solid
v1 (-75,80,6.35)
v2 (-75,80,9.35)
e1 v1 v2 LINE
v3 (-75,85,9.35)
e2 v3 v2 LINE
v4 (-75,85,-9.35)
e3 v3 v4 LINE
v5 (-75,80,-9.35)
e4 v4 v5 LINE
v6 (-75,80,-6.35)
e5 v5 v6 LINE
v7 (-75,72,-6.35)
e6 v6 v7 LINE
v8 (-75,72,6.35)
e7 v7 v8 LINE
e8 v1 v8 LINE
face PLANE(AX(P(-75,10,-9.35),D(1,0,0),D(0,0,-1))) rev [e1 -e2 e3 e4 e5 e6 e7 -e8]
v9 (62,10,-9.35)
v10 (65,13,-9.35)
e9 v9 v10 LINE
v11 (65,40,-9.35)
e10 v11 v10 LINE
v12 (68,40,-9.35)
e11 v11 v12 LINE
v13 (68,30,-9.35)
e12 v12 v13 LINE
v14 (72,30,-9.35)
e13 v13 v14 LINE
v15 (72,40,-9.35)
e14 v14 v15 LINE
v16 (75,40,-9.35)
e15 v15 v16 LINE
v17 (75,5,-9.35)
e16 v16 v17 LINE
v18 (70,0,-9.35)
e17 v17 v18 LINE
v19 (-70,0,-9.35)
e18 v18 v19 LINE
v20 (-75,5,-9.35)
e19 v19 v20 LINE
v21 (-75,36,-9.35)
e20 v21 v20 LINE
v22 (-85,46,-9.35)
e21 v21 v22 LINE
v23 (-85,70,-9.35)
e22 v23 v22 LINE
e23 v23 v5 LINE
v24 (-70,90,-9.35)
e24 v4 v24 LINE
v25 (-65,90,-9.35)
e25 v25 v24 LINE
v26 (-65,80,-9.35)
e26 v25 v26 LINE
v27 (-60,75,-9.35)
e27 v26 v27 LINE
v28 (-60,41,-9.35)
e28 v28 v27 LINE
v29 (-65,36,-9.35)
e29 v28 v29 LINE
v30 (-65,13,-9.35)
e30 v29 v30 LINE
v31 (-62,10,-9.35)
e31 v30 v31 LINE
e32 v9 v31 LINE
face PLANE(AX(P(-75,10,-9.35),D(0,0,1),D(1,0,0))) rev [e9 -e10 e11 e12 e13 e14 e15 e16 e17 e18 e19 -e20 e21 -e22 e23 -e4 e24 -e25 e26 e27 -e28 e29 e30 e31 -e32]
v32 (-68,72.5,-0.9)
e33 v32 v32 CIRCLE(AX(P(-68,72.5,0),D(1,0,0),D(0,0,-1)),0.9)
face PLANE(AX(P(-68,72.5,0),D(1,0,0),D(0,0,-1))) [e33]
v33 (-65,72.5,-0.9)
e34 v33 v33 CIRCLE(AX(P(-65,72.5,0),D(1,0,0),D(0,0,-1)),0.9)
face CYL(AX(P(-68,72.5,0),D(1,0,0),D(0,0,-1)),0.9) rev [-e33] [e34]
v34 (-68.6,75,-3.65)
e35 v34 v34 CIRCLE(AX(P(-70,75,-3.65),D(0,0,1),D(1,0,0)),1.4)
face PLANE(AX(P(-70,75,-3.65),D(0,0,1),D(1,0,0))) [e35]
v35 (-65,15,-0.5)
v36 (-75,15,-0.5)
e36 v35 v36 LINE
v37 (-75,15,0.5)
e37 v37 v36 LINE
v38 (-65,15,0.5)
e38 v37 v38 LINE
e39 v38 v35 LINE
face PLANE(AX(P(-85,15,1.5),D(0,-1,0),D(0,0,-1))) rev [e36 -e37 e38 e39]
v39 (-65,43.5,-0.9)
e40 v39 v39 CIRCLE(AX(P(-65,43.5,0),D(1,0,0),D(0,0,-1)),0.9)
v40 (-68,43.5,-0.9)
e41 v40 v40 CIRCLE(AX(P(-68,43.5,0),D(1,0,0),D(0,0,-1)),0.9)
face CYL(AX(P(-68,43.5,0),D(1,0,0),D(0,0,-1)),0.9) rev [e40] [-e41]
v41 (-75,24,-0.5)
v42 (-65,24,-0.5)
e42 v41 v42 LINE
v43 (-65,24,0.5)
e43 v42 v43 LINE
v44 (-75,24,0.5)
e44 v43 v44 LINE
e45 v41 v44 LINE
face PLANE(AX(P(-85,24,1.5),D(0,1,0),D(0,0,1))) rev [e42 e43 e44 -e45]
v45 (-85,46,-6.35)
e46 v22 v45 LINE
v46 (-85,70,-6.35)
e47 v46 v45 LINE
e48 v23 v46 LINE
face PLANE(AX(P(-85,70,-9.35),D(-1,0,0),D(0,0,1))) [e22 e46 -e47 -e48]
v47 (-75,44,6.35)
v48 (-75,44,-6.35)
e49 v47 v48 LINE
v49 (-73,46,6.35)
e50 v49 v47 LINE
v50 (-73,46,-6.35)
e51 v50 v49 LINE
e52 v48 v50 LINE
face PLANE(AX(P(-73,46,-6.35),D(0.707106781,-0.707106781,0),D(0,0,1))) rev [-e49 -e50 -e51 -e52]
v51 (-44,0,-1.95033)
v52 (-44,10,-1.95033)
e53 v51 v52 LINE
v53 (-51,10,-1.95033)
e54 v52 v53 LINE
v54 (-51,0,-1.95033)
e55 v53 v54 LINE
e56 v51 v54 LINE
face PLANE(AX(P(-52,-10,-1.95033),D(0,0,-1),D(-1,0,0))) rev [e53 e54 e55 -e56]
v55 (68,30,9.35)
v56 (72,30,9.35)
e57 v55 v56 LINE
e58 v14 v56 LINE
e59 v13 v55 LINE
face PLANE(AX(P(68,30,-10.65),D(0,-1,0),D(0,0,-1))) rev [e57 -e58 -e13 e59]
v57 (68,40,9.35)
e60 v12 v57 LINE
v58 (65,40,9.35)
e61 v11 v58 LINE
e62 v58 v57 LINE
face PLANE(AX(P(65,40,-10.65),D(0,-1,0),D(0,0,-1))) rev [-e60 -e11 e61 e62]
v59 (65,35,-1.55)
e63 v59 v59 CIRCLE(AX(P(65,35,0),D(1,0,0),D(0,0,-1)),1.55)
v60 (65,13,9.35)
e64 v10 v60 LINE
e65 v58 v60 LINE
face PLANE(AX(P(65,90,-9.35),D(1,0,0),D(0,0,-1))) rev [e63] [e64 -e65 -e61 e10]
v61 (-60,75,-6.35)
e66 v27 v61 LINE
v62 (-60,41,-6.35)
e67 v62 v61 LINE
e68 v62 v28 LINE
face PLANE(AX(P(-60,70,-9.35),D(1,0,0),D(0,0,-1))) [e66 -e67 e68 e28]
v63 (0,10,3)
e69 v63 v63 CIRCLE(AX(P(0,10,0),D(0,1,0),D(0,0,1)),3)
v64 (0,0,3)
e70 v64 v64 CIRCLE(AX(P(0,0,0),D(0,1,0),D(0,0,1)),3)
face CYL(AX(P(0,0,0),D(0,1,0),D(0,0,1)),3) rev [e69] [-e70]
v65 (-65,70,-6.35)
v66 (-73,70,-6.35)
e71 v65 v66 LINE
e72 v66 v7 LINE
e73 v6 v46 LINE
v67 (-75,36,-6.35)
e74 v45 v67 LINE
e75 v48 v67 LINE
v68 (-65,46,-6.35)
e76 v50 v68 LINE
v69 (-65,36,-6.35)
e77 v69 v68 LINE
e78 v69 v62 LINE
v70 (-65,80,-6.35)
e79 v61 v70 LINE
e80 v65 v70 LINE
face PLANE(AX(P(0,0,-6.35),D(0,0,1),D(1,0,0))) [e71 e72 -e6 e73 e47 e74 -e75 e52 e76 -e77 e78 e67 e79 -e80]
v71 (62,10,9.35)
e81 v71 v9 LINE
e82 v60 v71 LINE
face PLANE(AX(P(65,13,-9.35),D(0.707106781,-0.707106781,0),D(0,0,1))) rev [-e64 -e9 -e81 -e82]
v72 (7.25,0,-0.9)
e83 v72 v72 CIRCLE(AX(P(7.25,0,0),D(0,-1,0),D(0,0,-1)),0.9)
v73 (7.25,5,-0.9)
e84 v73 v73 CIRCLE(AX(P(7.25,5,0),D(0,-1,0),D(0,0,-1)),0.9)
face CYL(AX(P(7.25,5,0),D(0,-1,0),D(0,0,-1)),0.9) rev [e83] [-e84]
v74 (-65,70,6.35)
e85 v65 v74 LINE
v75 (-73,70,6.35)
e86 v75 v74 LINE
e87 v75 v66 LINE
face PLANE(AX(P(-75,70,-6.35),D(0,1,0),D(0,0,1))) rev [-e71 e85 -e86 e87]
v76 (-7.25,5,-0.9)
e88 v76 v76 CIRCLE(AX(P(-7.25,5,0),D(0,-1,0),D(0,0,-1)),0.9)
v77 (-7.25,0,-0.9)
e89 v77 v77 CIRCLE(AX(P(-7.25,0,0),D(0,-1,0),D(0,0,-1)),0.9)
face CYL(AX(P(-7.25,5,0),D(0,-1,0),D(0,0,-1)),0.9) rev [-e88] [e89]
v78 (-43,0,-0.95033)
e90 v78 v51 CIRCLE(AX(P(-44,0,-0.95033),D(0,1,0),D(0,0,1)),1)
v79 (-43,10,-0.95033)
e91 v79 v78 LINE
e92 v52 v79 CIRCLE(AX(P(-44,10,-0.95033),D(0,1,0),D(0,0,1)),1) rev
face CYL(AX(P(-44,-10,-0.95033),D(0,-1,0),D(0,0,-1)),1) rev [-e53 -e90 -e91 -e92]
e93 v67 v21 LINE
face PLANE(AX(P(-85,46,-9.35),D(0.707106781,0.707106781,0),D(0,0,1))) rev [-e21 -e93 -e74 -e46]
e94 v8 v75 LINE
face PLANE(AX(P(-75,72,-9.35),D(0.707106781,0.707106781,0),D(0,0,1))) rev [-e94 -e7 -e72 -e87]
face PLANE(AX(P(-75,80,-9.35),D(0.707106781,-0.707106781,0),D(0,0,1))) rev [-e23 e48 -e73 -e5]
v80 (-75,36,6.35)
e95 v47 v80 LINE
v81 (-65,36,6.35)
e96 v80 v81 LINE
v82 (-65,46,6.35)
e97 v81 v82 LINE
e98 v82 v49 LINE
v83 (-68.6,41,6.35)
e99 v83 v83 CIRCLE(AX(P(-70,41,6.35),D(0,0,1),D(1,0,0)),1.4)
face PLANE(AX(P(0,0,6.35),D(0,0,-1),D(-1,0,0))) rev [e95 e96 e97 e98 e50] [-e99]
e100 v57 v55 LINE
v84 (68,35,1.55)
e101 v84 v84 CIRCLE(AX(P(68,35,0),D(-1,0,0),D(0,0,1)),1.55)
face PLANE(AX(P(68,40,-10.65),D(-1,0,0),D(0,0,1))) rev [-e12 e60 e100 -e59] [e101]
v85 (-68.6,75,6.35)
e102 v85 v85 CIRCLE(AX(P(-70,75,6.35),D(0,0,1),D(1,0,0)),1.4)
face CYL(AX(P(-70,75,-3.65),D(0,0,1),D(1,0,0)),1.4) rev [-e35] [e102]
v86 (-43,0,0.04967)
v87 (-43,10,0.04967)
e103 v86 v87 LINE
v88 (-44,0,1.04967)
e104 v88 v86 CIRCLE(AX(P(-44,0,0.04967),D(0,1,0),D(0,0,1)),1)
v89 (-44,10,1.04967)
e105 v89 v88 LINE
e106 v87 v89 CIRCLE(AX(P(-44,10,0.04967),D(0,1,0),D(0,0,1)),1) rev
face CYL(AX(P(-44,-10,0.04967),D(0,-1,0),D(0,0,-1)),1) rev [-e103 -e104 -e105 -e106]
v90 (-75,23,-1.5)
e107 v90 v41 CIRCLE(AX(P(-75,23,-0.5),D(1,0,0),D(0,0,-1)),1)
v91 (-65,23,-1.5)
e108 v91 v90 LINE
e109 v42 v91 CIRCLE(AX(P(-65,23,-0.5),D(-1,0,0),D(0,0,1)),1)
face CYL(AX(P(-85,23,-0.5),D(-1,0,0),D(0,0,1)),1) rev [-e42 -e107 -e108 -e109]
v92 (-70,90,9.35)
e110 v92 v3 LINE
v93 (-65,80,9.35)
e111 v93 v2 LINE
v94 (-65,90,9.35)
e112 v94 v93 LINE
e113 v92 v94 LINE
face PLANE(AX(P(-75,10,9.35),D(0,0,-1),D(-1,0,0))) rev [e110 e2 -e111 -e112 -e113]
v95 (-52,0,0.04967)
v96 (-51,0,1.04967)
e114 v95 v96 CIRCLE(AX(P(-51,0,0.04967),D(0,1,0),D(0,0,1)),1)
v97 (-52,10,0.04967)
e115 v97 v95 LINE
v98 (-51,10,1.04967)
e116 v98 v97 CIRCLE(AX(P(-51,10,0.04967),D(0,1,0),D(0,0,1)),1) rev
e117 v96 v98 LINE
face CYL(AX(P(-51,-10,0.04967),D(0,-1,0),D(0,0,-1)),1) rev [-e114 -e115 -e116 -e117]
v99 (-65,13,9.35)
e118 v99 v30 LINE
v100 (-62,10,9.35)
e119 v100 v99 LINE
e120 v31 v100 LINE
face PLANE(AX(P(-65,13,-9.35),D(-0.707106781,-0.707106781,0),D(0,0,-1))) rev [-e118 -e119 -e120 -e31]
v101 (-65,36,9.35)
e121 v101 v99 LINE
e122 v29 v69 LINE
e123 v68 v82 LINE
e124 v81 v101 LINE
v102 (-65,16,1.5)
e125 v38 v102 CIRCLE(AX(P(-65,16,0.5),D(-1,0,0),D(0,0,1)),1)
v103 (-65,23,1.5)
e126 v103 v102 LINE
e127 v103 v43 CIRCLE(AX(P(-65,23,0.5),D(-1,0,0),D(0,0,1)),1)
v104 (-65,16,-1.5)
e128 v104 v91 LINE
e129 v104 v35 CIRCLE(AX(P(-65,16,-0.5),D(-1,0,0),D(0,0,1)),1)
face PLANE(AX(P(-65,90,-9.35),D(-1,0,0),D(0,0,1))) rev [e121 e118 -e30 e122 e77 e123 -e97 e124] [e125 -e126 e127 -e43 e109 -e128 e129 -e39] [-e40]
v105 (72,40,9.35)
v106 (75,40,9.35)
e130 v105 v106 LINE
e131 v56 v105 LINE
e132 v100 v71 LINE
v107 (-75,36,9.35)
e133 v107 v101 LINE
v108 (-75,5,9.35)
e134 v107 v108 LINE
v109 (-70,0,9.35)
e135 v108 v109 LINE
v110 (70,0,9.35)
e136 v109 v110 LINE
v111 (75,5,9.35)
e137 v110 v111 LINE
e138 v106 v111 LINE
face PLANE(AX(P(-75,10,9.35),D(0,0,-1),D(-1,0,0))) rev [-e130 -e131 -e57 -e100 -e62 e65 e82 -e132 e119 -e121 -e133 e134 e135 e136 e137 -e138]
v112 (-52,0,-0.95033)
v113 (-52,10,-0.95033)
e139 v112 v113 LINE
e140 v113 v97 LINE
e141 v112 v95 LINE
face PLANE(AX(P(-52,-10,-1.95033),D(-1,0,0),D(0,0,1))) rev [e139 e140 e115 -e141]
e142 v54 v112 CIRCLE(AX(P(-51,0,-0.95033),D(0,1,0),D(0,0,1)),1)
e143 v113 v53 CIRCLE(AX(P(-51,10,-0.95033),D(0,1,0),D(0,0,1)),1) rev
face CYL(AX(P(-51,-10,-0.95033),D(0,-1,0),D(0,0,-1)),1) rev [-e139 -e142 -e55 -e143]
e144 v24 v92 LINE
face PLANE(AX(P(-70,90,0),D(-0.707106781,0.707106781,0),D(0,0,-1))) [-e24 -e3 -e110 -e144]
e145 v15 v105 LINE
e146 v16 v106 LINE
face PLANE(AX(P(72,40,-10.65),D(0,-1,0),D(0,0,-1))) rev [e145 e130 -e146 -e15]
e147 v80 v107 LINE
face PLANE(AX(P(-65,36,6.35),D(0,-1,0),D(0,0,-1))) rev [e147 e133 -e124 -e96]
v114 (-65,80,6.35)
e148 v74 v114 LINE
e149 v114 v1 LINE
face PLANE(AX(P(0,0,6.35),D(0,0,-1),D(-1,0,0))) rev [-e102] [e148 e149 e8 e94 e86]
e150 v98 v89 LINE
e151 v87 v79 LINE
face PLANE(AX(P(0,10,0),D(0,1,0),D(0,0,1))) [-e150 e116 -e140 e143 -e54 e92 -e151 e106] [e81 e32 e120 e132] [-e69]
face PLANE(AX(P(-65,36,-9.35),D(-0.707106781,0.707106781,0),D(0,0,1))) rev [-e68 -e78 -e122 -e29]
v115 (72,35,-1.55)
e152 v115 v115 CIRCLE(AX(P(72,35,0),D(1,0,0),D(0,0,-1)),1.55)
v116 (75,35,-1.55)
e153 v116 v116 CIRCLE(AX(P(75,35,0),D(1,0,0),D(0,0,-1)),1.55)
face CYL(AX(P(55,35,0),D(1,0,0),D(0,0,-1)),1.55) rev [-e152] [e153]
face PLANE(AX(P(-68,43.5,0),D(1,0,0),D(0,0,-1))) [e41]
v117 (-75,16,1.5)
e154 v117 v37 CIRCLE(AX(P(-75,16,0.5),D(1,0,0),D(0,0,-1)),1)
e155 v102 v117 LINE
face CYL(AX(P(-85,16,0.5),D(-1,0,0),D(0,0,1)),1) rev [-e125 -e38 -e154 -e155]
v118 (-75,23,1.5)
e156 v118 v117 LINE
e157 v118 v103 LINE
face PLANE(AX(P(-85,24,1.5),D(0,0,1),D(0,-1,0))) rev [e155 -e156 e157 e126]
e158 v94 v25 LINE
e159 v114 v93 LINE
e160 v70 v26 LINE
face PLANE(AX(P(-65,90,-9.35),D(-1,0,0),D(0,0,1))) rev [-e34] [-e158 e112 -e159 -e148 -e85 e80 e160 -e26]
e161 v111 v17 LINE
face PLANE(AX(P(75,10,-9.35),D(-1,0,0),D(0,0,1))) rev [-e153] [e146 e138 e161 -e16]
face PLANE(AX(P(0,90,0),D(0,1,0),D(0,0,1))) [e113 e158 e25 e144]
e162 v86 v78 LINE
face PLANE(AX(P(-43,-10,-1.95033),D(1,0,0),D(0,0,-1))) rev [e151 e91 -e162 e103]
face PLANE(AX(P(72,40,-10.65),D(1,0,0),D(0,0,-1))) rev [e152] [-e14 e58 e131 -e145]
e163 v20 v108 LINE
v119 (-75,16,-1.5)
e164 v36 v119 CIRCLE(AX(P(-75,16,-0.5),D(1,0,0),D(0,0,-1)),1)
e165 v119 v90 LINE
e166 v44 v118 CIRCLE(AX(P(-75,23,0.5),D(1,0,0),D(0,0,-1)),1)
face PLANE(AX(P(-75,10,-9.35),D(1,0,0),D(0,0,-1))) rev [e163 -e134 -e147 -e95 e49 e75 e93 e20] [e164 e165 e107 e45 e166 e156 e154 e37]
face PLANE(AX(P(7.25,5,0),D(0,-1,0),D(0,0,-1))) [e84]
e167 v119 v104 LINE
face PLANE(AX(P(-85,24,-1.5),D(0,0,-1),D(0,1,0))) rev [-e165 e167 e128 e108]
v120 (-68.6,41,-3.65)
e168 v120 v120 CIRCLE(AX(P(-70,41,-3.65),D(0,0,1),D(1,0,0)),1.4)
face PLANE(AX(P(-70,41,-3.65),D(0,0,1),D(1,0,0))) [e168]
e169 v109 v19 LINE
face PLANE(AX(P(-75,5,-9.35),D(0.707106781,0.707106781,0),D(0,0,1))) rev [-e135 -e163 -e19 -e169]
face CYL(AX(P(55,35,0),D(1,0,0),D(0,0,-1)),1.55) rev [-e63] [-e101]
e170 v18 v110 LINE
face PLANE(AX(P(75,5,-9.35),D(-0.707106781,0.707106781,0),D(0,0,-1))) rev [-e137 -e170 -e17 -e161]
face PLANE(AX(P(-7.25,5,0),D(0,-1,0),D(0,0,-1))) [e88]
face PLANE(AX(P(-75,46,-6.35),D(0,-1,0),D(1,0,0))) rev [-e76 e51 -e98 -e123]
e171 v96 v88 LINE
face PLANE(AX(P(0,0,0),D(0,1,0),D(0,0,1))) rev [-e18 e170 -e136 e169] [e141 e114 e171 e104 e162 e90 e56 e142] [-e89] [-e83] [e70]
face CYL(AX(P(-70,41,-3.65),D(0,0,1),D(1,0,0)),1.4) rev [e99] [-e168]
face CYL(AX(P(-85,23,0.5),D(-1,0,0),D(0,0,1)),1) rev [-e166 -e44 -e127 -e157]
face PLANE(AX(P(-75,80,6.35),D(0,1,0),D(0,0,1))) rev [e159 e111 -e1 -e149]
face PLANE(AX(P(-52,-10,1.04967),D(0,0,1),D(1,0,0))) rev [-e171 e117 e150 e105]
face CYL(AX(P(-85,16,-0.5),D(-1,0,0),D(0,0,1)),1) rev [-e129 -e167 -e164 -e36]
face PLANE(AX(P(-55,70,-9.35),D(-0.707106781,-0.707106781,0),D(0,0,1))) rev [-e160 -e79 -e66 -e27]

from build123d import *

# Parameters (mm, degrees)
SKETCH1_W           = 150
SKETCH1_H           = 18.7
BOSS_EXTRUDE1_DEPTH = 10
SKETCH2_R           = 3
CUT_EXTRUDE1_DEPTH  = 10
SKETCH3_R           = 0.9
CUT_EXTRUDE2_DEPTH  = 5
SKETCH4_W           = 10
SKETCH4_H           = 18.7
BOSS_EXTRUDE2_DEPTH = 80
SKETCH5_W           = 10
SKETCH5_H           = 24
CUT_EXTRUDE3_DEPTH  = 15.7
SKETCH6_W           = 10
SKETCH6_H           = 24
SKETCH6_W_2         = 5
BOSS_EXTRUDE3_DEPTH = 3
CHAMFER1_SIZE       = 10
CHAMFER2_SIZE       = 2
SKETCH7_W           = 10
SKETCH7_H           = 10
CUT_EXTRUDE4_DEPTH  = 3
SKETCH9_R           = 1.4
CUT_EXTRUDE5_DEPTH  = 10
CUT_EXTRUDE6_DEPTH  = 20
CHAMFER3_SIZE       = 5
CHAMFER4_SIZE       = 5
CHAMFER5_SIZE       = 3
SKETCH11_W          = 9
SKETCH11_H          = 3
CUT_EXTRUDE7_DEPTH  = 20
FILLET1_R           = 1
SKETCH12_W          = 3
SKETCH12_H          = 9
CUT_EXTRUDE8_DEPTH  = 20
FILLET2_R           = 1
SKETCH13_R          = 1.55
CUT_EXTRUDE9_DEPTH  = 20
SKETCH14_R          = 0.9
CUT_EXTRUDE10_DEPTH = 3
CHAMFER6_SIZE       = 2


with BuildPart() as part:
    # Sketch1 → Boss-Extrude1 (new body)
    with BuildSketch(Plane(origin=(0, 0, 0), x_dir=(1, 0, 0), z_dir=(0, 1, 0))):
        Rectangle(SKETCH1_W, SKETCH1_H)
    extrude(amount=BOSS_EXTRUDE1_DEPTH)

    # Sketch2 → Cut-Extrude1 (cut)
    with BuildSketch(Plane(origin=(0, 10, 0), x_dir=(1, 0, 0), z_dir=(0, 1, 0))):
        with Locations(Location((0, 0, 0), (0, 0, 270))):
            Circle(SKETCH2_R)
    extrude(amount=-CUT_EXTRUDE1_DEPTH, mode=Mode.SUBTRACT)

    # Sketch3 → Cut-Extrude2 (cut)
    with BuildSketch(Plane.XZ):
        with Locations(Location((7.25, 0, 0), (0, 0, 270))):
            Circle(SKETCH3_R)
        with Locations(Location((-7.25, 0, 0), (0, 0, 270))):
            Circle(SKETCH3_R)
    extrude(amount=-CUT_EXTRUDE2_DEPTH, mode=Mode.SUBTRACT)

    # Sketch4 → Boss-Extrude2 (add)
    with BuildSketch(Plane(origin=(0, 10, 0), x_dir=(1, 0, 0), z_dir=(0, 1, 0))):
        with Locations((-70, 0)):
            Rectangle(SKETCH4_W, SKETCH4_H)
        with Locations((70, 0)):
            Rectangle(SKETCH4_W, SKETCH4_H)
    extrude(amount=BOSS_EXTRUDE2_DEPTH)

    # Sketch5 → Cut-Extrude3 (cut)
    with BuildSketch(Plane.XY.offset(9.35)):
        with Locations((-70, 58)):
            Rectangle(SKETCH5_W, SKETCH5_H)
    extrude(amount=-CUT_EXTRUDE3_DEPTH, mode=Mode.SUBTRACT)

    # Sketch6 → Boss-Extrude3 (add)
    with BuildSketch(Plane.XY.offset(-6.35)):
        with Locations((-80, 58)):
            Rectangle(SKETCH6_W, SKETCH6_H)
        with Locations((-62.5, 58)):
            Rectangle(SKETCH6_W_2, SKETCH6_H)
    extrude(amount=-BOSS_EXTRUDE3_DEPTH)

    # Chamfer1
    # the kernel refuses this chamfer: 10 mm, written as the material it adds along each edge
    with BuildSketch(Plane(origin=(-75, 70, -6.35), x_dir=(0.027495876610586317, 0.9996219169112968, 0), z_dir=(0, 0, -1))) as chamfer1_piece_1:
        Polygon((CHAMFER1_SIZE * 0.999621916911, -CHAMFER1_SIZE * 0.0274958766106), (-CHAMFER1_SIZE * 0.0274958766106, -CHAMFER1_SIZE * 0.999621916911), (0, 0), align=None)
    extrude(amount=3)
    with BuildSketch(Plane(origin=(-75, 46, -6.35), x_dir=(0.027495876610586317, -0.9996219169112968, 0), z_dir=(0, 0, -1))) as chamfer1_piece_2:
        Polygon((CHAMFER1_SIZE * 0.999621916911, CHAMFER1_SIZE * 0.0274958766106), (-CHAMFER1_SIZE * 0.0274958766106, CHAMFER1_SIZE * 0.999621916911), (0, 0), align=None)
    extrude(amount=3)
    with BuildSketch(Plane(origin=(-65, 46, -6.35), x_dir=(-0.027495876610586317, -0.9996219169112968, 0), z_dir=(0, 0, -1))) as chamfer1_piece_3_section:
        Polygon((CHAMFER1_SIZE * 0.999621916911, -CHAMFER1_SIZE * 0.0274958766106), (-CHAMFER1_SIZE * 0.0274958766106, -CHAMFER1_SIZE * 0.999621916911), (0, 0), align=None)
    chamfer1_piece_3 = extrude(amount=3, mode=Mode.PRIVATE)
    chamfer1_piece_3 = split(chamfer1_piece_3, bisect_by=Plane(origin=(-60, 42.111111111, -7.85), z_dir=(-1, 0, 0)), keep=Keep.TOP, mode=Mode.PRIVATE)
    add(chamfer1_piece_3)
    with BuildSketch(Plane(origin=(-65, 70, -6.35), x_dir=(-0.027495876610586317, 0.9996219169112968, 0), z_dir=(0, 0, -1))) as chamfer1_piece_4_section:
        Polygon((CHAMFER1_SIZE * 0.999621916911, CHAMFER1_SIZE * 0.0274958766106), (-CHAMFER1_SIZE * 0.0274958766106, CHAMFER1_SIZE * 0.999621916911), (0, 0), align=None)
    chamfer1_piece_4 = extrude(amount=3, mode=Mode.PRIVATE)
    chamfer1_piece_4 = split(chamfer1_piece_4, bisect_by=Plane(origin=(-60, 73.888888889, -7.85), z_dir=(-1, 0, 0)), keep=Keep.TOP, mode=Mode.PRIVATE)
    add(chamfer1_piece_4)

    # Chamfer2
    chamfer2_edges = [part.edges().sort_by_distance(p)[0] for p in [
        (-75, 46, 1.5),
    ]]
    chamfer(chamfer2_edges, length=CHAMFER2_SIZE)

    # Sketch7 → Cut-Extrude4 (cut)
    with BuildSketch(Plane.XY.offset(9.35)):
        with Locations((-70, 75)):
            Rectangle(SKETCH7_W, SKETCH7_H)
        with Locations((-70, 41)):
            Rectangle(SKETCH7_W, SKETCH7_H)
    extrude(amount=-CUT_EXTRUDE4_DEPTH, mode=Mode.SUBTRACT)

    # Sketch9 → Cut-Extrude5 (cut)
    with BuildSketch(Plane.XY.offset(6.35)):
        with Locations((-70, 75)):
            Circle(SKETCH9_R)
        with Locations((-70, 41)):
            Circle(SKETCH9_R)
    extrude(amount=-CUT_EXTRUDE5_DEPTH, mode=Mode.SUBTRACT)

    # Sketch10 → Cut-Extrude6 (cut)
    with BuildSketch(Plane.XY.offset(9.35)):
        Polygon((65, 90), (75, 90), (75, 40), (72, 40), (72, 30), (68, 30), (68, 40), (65, 40), align=None)
    extrude(amount=-CUT_EXTRUDE6_DEPTH, mode=Mode.SUBTRACT)

    # Chamfer3
    chamfer3_edges = [part.edges().sort_by_distance(p)[0] for p in [
        (-75, 90, 0),
    ]]
    chamfer(chamfer3_edges, length=CHAMFER3_SIZE)

    # Chamfer4
    chamfer4_edges = [part.edges().sort_by_distance(p)[0] for p in [
        (-75, 0, 0),
        (75, 0, 0),
    ]]
    chamfer(chamfer4_edges, length=CHAMFER4_SIZE)

    # Chamfer5
    chamfer5_edges = [part.edges().sort_by_distance(p)[0] for p in [
        (-65, 10, 0),
        (65, 10, 0),
    ]]
    chamfer(chamfer5_edges, length=CHAMFER5_SIZE)

    # Sketch11 → Cut-Extrude7 (cut)
    with BuildSketch(Plane(origin=(0, 10, 0), x_dir=(1, 0, 0), z_dir=(0, 1, 0))):
        with Locations((-47.5, 0.450329583)):
            Rectangle(SKETCH11_W, SKETCH11_H)
    extrude(amount=-CUT_EXTRUDE7_DEPTH, mode=Mode.SUBTRACT)

    # Fillet1
    fillet1_edges = [part.edges().sort_by_distance(p)[0] for p in [
        (-43, 5, -1.950329583),
        (-43, 5, 1.049670417),
        (-52, 5, 1.049670417),
        (-52, 5, -1.950329583),
    ]]
    fillet(fillet1_edges, radius=FILLET1_R)

    # Sketch12 → Cut-Extrude8 (cut)
    with BuildSketch(Plane(origin=(-65, 0, 0), x_dir=(0, 0, -1), z_dir=(1, 0, 0))):
        with Locations((0, 19.5)):
            Rectangle(SKETCH12_W, SKETCH12_H)
    extrude(amount=-CUT_EXTRUDE8_DEPTH, mode=Mode.SUBTRACT)

    # Fillet2
    fillet2_edges = [part.edges().sort_by_distance(p)[0] for p in [
        (-70, 24, -1.5),
        (-70, 15, -1.5),
        (-70, 15, 1.5),
        (-70, 24, 1.5),
    ]]
    fillet(fillet2_edges, radius=FILLET2_R)

    # Sketch13 → Cut-Extrude9 (cut)
    with BuildSketch(Plane(origin=(75, 0, 0), x_dir=(0, 0, -1), z_dir=(1, 0, 0))):
        with Locations((0, 35)):
            Circle(SKETCH13_R)
    extrude(amount=-CUT_EXTRUDE9_DEPTH, mode=Mode.SUBTRACT)

    # Sketch14 → Cut-Extrude10 (cut)
    with BuildSketch(Plane(origin=(-65, 0, 0), x_dir=(0, 0, -1), z_dir=(1, 0, 0))):
        with Locations((0, 72.5)):
            Circle(SKETCH14_R)
        with Locations((0, 43.5)):
            Circle(SKETCH14_R)
    extrude(amount=-CUT_EXTRUDE10_DEPTH, mode=Mode.SUBTRACT)

    # Chamfer6
    chamfer6_edges = [part.edges().sort_by_distance(p)[0] for p in [
        (-75, 70, 0),
    ]]
    chamfer(chamfer6_edges, length=CHAMFER6_SIZE)


solid = part.part
